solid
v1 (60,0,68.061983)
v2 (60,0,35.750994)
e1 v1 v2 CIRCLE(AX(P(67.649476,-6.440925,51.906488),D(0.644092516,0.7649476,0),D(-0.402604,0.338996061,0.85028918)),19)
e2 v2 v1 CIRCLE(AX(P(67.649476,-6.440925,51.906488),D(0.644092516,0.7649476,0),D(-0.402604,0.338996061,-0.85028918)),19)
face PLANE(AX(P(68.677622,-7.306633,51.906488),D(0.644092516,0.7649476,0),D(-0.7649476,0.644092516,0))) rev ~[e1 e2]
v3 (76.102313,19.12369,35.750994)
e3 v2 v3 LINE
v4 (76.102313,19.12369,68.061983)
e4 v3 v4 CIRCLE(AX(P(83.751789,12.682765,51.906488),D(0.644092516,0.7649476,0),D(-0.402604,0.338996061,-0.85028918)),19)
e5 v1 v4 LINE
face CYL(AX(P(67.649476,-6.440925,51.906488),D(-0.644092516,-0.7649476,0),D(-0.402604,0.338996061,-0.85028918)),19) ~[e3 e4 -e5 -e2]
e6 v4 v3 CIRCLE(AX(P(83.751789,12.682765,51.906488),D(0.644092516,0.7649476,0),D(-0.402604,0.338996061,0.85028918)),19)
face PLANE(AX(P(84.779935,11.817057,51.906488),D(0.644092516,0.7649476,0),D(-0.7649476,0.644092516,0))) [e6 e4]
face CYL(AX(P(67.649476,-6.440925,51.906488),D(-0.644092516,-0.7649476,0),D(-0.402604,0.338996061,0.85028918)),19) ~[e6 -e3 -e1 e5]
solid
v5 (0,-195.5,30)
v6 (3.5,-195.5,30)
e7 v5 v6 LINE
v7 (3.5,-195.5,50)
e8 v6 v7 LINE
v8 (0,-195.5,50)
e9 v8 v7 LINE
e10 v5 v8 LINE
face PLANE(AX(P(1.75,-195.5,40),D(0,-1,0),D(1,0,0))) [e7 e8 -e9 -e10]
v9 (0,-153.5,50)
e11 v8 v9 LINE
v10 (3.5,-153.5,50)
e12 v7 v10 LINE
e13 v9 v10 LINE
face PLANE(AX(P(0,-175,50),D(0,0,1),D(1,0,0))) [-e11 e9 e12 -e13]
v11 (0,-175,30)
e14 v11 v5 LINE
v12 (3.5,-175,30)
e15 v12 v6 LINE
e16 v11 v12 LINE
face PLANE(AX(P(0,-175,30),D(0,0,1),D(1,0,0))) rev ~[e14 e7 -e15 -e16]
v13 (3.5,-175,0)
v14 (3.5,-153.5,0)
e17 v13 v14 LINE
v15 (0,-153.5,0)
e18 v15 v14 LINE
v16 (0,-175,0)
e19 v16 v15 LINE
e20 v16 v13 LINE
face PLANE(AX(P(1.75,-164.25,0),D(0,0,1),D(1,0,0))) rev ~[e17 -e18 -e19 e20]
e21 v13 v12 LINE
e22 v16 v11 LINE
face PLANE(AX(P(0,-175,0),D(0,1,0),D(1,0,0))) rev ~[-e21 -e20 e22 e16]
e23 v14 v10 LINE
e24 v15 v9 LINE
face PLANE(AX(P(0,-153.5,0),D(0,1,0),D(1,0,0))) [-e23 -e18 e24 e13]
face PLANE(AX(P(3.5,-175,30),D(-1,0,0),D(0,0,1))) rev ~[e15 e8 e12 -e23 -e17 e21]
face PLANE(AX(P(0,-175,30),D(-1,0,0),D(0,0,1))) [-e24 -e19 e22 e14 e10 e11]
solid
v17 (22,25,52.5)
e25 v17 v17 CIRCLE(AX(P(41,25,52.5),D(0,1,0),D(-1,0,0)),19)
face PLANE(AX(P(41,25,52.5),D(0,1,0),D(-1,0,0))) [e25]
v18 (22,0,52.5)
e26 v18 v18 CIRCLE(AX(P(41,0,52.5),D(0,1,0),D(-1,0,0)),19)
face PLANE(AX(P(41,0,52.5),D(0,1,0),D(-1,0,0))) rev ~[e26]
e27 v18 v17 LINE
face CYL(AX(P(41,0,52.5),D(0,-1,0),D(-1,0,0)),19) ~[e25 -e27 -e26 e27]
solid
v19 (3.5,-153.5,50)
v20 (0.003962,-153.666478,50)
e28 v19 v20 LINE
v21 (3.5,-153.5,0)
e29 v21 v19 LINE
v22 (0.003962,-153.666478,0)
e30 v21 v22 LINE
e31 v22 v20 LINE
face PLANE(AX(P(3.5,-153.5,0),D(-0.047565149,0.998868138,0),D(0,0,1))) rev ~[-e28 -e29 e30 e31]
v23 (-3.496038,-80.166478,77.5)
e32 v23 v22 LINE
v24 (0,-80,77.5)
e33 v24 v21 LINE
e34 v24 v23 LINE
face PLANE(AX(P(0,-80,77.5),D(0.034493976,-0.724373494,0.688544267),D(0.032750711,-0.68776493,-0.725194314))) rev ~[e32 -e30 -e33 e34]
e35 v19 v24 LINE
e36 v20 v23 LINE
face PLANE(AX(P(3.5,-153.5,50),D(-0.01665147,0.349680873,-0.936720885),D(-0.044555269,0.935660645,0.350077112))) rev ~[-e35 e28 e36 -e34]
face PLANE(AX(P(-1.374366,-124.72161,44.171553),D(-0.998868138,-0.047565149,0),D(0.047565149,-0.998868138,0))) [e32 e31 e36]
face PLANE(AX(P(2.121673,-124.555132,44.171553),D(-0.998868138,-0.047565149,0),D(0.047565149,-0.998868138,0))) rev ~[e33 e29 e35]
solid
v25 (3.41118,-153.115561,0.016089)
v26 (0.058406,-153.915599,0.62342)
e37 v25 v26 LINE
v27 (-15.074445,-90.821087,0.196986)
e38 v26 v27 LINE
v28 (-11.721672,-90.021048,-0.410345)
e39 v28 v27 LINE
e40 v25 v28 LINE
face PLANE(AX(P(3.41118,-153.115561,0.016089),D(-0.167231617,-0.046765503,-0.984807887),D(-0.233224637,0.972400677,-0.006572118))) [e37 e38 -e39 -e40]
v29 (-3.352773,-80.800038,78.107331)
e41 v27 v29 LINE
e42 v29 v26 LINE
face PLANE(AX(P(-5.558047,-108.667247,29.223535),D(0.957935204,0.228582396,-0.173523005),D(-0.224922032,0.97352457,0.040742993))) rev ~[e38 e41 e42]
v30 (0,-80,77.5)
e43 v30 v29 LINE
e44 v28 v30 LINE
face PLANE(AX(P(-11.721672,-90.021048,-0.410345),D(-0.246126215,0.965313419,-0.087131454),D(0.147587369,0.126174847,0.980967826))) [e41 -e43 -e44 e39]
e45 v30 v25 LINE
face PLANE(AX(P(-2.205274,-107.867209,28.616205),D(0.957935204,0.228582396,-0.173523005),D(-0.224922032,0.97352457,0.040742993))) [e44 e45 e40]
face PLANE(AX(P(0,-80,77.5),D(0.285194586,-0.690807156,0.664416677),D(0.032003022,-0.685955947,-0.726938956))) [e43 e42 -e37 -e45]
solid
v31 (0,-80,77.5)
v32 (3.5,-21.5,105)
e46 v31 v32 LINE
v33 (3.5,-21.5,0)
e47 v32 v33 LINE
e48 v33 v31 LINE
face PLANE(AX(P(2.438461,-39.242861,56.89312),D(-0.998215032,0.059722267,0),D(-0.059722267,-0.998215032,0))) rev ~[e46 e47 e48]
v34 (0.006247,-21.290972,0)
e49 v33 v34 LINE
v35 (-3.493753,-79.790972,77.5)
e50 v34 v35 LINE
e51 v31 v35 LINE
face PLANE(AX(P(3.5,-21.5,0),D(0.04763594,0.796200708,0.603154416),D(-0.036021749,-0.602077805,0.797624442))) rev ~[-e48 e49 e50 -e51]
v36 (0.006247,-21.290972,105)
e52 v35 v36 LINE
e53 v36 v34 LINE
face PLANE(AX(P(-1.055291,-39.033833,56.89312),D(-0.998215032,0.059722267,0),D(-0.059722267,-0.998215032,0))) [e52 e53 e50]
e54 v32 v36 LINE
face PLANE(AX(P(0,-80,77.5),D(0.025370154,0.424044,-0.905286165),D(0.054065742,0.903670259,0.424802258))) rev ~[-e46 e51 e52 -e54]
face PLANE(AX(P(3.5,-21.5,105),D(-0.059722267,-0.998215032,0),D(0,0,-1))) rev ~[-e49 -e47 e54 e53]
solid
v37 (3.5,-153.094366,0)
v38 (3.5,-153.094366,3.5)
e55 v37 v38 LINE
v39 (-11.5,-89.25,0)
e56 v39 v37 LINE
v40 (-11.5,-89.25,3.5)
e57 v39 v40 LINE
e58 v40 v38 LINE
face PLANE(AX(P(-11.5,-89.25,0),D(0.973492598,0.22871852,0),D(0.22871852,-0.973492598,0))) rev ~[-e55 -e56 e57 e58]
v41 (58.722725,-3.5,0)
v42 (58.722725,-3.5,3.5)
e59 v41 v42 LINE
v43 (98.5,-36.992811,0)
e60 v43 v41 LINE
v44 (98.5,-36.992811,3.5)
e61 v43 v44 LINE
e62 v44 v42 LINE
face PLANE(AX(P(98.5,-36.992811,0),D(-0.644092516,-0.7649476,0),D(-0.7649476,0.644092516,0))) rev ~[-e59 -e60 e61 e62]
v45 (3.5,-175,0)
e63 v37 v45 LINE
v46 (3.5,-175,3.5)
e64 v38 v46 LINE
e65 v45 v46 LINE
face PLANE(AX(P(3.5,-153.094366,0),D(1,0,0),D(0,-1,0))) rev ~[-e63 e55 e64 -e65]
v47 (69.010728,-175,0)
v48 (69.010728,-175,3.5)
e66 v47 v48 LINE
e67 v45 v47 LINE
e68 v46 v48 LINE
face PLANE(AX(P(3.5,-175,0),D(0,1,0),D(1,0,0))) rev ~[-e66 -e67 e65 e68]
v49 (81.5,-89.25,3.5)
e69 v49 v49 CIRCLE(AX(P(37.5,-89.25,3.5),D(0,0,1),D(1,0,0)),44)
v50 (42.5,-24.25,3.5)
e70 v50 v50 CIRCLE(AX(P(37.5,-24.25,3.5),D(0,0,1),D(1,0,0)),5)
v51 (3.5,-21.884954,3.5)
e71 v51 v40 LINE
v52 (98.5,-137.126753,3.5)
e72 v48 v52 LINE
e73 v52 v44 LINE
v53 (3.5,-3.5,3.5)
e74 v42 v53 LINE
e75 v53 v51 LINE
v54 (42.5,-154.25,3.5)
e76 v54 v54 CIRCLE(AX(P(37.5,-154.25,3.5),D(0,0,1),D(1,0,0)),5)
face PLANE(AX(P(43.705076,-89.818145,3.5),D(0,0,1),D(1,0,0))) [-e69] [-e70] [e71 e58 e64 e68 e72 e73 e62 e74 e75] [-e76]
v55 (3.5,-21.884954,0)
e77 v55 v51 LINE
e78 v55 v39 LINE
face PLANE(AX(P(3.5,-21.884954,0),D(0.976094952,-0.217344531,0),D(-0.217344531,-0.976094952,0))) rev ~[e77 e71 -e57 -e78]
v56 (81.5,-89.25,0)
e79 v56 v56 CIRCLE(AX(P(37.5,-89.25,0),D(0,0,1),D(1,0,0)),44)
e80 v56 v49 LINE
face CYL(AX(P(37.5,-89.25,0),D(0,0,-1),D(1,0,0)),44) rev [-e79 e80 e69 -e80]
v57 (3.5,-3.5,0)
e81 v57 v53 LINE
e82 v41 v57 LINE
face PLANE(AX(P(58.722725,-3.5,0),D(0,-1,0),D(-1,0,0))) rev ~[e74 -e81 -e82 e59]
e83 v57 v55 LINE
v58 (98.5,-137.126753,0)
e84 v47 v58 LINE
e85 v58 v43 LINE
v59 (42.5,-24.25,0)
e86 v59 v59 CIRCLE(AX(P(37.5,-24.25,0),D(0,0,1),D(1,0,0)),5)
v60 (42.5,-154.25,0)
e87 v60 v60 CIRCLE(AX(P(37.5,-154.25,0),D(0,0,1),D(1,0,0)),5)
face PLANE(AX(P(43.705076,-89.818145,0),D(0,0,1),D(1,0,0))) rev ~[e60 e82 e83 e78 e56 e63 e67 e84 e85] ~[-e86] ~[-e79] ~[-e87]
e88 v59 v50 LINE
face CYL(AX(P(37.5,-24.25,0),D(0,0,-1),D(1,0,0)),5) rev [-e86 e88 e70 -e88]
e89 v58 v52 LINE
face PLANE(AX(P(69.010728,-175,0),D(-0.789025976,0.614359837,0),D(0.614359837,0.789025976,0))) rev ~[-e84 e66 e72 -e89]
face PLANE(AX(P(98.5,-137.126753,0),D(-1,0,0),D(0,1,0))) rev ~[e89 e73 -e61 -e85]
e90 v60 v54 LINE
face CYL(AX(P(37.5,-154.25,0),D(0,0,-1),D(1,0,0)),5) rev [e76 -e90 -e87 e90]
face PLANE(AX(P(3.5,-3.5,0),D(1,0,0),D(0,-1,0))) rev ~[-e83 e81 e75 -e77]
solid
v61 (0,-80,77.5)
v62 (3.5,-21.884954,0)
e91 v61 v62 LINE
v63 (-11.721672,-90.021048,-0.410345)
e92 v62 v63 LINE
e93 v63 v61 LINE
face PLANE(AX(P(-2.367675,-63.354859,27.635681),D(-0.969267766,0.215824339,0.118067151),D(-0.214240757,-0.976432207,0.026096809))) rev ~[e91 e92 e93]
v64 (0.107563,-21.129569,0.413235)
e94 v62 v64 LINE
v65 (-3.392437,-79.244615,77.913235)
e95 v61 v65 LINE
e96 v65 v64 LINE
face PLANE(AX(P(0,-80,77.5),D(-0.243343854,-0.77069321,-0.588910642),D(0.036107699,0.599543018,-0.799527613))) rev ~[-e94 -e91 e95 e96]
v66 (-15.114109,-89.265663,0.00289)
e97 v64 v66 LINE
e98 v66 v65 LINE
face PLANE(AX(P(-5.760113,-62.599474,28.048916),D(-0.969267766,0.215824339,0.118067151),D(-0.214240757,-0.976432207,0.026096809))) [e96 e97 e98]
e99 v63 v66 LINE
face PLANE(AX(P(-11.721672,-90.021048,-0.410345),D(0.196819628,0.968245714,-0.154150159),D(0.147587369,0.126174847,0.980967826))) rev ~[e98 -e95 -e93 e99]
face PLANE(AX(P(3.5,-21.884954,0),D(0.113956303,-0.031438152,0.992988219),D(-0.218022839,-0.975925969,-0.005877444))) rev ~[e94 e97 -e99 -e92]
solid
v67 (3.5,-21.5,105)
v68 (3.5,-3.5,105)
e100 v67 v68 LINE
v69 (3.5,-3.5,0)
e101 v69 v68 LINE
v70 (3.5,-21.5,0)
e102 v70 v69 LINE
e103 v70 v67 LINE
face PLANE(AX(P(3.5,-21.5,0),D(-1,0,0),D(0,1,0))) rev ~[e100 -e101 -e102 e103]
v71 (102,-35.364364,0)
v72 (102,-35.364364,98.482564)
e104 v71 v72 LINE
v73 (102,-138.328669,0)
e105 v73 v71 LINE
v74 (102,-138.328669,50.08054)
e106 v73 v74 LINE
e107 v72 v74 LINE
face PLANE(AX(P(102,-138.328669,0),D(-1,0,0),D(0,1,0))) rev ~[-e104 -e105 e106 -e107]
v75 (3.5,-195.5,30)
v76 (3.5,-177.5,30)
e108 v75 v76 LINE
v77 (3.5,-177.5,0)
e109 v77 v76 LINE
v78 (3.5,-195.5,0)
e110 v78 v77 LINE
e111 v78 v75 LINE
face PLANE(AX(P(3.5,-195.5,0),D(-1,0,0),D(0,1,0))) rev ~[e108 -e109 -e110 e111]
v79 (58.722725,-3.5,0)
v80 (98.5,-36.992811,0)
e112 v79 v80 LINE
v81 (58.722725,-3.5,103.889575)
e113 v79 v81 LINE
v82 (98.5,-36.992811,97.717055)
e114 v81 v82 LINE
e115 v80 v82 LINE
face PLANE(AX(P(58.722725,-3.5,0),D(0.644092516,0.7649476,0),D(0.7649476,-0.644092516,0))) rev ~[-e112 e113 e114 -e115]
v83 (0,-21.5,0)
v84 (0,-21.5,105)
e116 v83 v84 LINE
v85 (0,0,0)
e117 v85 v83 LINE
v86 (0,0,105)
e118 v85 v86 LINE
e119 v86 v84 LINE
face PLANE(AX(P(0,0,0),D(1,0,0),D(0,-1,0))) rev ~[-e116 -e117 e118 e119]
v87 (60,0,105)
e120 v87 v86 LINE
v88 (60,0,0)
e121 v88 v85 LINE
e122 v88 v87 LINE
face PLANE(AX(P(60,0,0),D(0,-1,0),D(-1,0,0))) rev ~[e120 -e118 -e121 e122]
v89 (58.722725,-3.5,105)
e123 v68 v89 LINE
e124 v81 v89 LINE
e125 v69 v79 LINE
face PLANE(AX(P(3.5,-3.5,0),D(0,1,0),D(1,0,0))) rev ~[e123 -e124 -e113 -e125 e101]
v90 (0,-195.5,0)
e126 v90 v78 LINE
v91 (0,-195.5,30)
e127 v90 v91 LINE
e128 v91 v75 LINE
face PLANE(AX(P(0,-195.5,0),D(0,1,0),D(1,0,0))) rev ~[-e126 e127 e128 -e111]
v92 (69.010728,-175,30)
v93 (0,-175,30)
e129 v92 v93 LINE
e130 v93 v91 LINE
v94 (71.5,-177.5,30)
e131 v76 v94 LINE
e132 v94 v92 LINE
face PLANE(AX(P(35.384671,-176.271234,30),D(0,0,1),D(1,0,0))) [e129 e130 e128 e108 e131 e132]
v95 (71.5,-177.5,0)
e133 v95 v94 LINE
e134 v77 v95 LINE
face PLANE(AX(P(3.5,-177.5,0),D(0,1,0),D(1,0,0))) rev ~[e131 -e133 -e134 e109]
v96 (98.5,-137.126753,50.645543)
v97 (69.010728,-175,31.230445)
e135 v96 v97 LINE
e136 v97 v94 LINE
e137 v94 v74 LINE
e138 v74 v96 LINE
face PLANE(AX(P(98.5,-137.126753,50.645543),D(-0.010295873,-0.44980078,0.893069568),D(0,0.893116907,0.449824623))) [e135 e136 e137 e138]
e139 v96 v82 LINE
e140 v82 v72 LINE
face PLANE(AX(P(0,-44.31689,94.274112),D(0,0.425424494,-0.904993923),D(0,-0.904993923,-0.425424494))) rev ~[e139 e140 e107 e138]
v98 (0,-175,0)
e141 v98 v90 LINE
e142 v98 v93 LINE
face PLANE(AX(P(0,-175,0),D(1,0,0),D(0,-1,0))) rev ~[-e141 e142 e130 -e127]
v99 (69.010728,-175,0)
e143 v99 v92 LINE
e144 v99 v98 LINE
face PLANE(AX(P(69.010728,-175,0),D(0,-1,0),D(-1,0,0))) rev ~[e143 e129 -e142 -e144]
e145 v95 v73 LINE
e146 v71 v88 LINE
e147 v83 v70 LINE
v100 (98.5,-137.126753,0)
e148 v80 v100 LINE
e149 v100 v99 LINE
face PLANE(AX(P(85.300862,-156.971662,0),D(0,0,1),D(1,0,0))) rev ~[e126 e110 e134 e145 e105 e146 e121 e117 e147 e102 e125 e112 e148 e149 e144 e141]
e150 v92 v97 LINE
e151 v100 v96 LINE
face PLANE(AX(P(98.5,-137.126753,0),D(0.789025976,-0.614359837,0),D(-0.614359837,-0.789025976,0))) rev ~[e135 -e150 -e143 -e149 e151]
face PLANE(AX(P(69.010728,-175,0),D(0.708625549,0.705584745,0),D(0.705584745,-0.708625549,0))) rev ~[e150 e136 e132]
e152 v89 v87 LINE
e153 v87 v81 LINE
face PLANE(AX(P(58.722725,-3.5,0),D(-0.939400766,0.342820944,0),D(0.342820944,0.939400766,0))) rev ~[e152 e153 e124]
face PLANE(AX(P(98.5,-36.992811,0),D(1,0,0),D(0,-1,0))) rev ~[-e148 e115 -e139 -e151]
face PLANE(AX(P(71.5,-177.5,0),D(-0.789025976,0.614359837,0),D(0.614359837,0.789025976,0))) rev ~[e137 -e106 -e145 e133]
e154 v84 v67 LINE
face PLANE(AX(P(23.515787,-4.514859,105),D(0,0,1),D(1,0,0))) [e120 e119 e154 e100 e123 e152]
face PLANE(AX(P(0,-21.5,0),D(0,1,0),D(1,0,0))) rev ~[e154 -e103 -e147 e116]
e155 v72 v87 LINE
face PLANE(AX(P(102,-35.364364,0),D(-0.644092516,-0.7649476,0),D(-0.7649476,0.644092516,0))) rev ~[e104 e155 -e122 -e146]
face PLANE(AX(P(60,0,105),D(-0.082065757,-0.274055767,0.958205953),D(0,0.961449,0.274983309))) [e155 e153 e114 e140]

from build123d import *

# Parameters (mm, degrees)
F0_W      = 3.5
F0_H      = 18
F6_DEPTH  = 30
F7_REACH  = 201.50633824
F8_DEPTH  = 105
F10_REACH = 161.9332117682
F12_REACH = 102.7827771036
F15_DEPTH = 25
F16_DEPTH = 25
F0_R      = 5
F0_R_2    = 44
F17_DEPTH = 3.5
F21_DEPTH = 3.5
F0_H_2    = 21.5
F22_DEPTH = 50
F26_DEPTH = 3.5
F30_DEPTH = 3.5
F34_DEPTH = 3.5
F35_W     = 3.5
F35_H     = 20
F36_DEPTH = 20.5


with BuildPart() as f6:
    # F0 (on Top) → F6 (new body, through all)
    with BuildSketch(Plane.XY):
        Polygon((3.5, -177.5), (71.5, -177.5), (69.0107278246, -175), (3.5, -175), (0, -175), (0, -177.5), align=None)
        with Locations((1.75, -186.5)):
            Rectangle(F0_W, F0_H)
    extrude(amount=F6_DEPTH)



with BuildPart() as f7:
    f7_end = Plane(origin=(0, -44.3168900323, 94.2741115233), x_dir=(0, -0.9049939228, -0.4254244936), z_dir=(0, 0.4254244936, -0.9049939228))
    # F0 (on Top) → F7 (new body, up to a plane its end follows)
    with BuildSketch(Plane.XY):
        Polygon((102, -138.3286694261), (102, -35.3643643935), (98.5, -36.9928108308), (98.5, -137.1267531552), align=None)
    f7_long = extrude(amount=F7_REACH, mode=Mode.PRIVATE)
    add(split(f7_long, bisect_by=f7_end, keep=Keep.TOP, mode=Mode.PRIVATE))



with BuildPart() as f8:
    # F0 (on Top) → F8 (new body, through all)
    with BuildSketch(Plane.XY):
        Polygon((60, 0), (0, 0), (0, -21.5), (3.5, -21.5), (3.5, -3.5), (58.722724796, -3.5), align=None)
    extrude(amount=F8_DEPTH)


with BuildPart() as f7_1:
    add(f7.part)

    add(f8.part)  # F10 merges F8
    f10_end = Plane(origin=(60, 0, 105), x_dir=(0, 0.9614490001, 0.2749833091), z_dir=(-0.0820657574, -0.2740557675, 0.9582059527))
    # F0 (on Top) → F10 (join, up to a plane its end follows)
    with BuildSketch(Plane.XY):
        Polygon((102, -35.3643643935), (60, 0), (58.722724796, -3.5), (98.5, -36.9928108308), align=None)
    f10_long = extrude(amount=F10_REACH, mode=Mode.PRIVATE)
    add(split(f10_long, bisect_by=f10_end, keep=Keep.BOTTOM, mode=Mode.PRIVATE))


with BuildPart() as f6_1:
    add(f6.part)

    add(f7_1.part)  # F12 merges F7
    f12_end = Plane(origin=(98.5, -137.1267531552, 50.6455433886), x_dir=(0, 0.8931169065, 0.4498246228), z_dir=(-0.0102958733, -0.4498007803, 0.8930695679))
    # F0 (on Top) → F12 (join, up to a plane its end follows)
    with BuildSketch(Plane.XY):
        Polygon((71.5, -177.5), (102, -138.3286694261), (98.5, -137.1267531552), (69.0107278246, -175), align=None)
    f12_long = extrude(amount=F12_REACH, mode=Mode.PRIVATE)
    add(split(f12_long, bisect_by=f12_end, keep=Keep.BOTTOM, mode=Mode.PRIVATE))


with BuildPart() as f15:
    # F13 (on face) → F15 (new body)
    with BuildSketch(Plane(origin=(0, 0, 0), x_dir=(-1, 0, 0), z_dir=(0, 1, 0))):
        with BuildLine():
            ThreePointArc((-60, 52.5), (-41, 33.5), (-22, 52.5))
            ThreePointArc((-22, 52.5), (-41, 71.5), (-60, 52.5))
        make_face()
    extrude(amount=F15_DEPTH)


with BuildPart() as f16:
    # F14 (on face) → F16 (new body)
    with BuildSketch(Plane(origin=(24.8913101482, 29.5618214594, 0), x_dir=(-0.7649476001, 0.644092516, 0), z_dir=(0.644092516, 0.7649476001, 0))):
        with BuildLine():
            Line((-45.8968560046, 35.7509940048), (-45.8968560046, 68.0619828476))
            ThreePointArc((-45.8968560046, 68.0619828476), (-74.8968560046, 51.9064884262), (-45.8968560046, 35.7509940048))
        make_face()
        with BuildLine():
            ThreePointArc((-45.8968560046, 35.7509940048), (-39.2986633319, 42.6598674217), (-36.8968560046, 51.9064884262))
            ThreePointArc((-36.8968560046, 51.9064884262), (-39.2986633319, 61.1531094306), (-45.8968560046, 68.0619828476))
            Line((-45.8968560046, 68.0619828476), (-45.8968560046, 35.7509940048))
        make_face()
    extrude(amount=F16_DEPTH)


with BuildPart() as f17:
    # F0 (on Top) → F17 (new body)
    with BuildSketch(Plane.XY):
        Polygon((98.5, -36.9928108308), (58.722724796, -3.5), (3.5, -3.5), (3.5, -21.5), (3.5, -21.8849541017), (-11.5, -89.25), (3.5, -153.094366445), (3.5, -153.5), (3.5, -175), (69.0107278246, -175), (98.5, -137.1267531552), align=None)
        with Locations((37.5, -154.25)):
            Circle(F0_R, mode=Mode.SUBTRACT)
        with Locations((37.5, -89.25)):
            Circle(F0_R_2, mode=Mode.SUBTRACT)
        with Locations((37.5, -24.25)):
            Circle(F0_R, mode=Mode.SUBTRACT)
    extrude(amount=F17_DEPTH)


with BuildPart() as f21:
    # F20 (on 3pt) → F21 (new body)
    with BuildSketch(Plane(origin=(7.8663280231, -1.7515748527, -0.9582026436), x_dir=(-0.2142407567, -0.9764322069, 0.0260968089), z_dir=(-0.9692677662, 0.2158243389, 0.1180671507))):
        Polygon((80.1370792473, 76.9313541176), (20.619331384, 0.4232091326), (90.4000018708, -1.8246819942), align=None)
    extrude(amount=F21_DEPTH)


with BuildPart() as f22:
    # F0 (on Top) → F22 (new body)
    with BuildSketch(Plane.XY):
        with Locations((1.75, -164.25)):
            Rectangle(F0_W, F0_H_2)
    extrude(amount=F22_DEPTH)

    # F35 (on face) → F36 (join, through all)
    with BuildSketch(Plane.XZ.offset(175)):
        with Locations((1.75, 40)):
            Rectangle(F35_W, F35_H)
    extrude(amount=F36_DEPTH)


with BuildPart() as f26:
    # F25 (on 3pt) → F26 (new body)
    with BuildSketch(Plane(origin=(-30.3997140605, -7.2539765203, 5.5066874197), x_dir=(-0.2249220316, 0.9735245699, 0.0407429925), z_dir=(0.9579352039, 0.228582396, -0.1735230051))):
        Polygon((-149.8283543617, 0.623847139), (-85.0179586872, -2.493068384), (-74.7243836748, 76.2589672614), align=None)
    extrude(amount=-F26_DEPTH)


with BuildPart() as f30:
    # F29 (on 3pt) → F30 (new body)
    with BuildSketch(Plane(origin=(4.7692531664, -0.285339933, 0), x_dir=(-0.0597222669, -0.9982150324, 0), z_dir=(-0.9982150324, 0.0597222669, 0))):
        Polygon((79.8572025891, 77.5), (21.2525952617, 105.0000000001), (21.2525952617, 0), align=None)
    extrude(amount=F30_DEPTH)


with BuildPart() as f34:
    # F33 (on 3pt) → F34 (new body)
    with BuildSketch(Plane(origin=(-3.8009049774, -0.1809954751, 0), x_dir=(0.0475651494, -0.9988681377, 0), z_dir=(-0.9988681377, -0.0475651494, 0))):
        Polygon((153.4927371637, 50), (79.909451018, 77.5), (153.4927371637, 0), align=None)
    extrude(amount=F34_DEPTH)


solid = Compound([f6_1.part, f15.part, f16.part, f17.part, f21.part, f22.part, f26.part, f30.part, f34.part])
